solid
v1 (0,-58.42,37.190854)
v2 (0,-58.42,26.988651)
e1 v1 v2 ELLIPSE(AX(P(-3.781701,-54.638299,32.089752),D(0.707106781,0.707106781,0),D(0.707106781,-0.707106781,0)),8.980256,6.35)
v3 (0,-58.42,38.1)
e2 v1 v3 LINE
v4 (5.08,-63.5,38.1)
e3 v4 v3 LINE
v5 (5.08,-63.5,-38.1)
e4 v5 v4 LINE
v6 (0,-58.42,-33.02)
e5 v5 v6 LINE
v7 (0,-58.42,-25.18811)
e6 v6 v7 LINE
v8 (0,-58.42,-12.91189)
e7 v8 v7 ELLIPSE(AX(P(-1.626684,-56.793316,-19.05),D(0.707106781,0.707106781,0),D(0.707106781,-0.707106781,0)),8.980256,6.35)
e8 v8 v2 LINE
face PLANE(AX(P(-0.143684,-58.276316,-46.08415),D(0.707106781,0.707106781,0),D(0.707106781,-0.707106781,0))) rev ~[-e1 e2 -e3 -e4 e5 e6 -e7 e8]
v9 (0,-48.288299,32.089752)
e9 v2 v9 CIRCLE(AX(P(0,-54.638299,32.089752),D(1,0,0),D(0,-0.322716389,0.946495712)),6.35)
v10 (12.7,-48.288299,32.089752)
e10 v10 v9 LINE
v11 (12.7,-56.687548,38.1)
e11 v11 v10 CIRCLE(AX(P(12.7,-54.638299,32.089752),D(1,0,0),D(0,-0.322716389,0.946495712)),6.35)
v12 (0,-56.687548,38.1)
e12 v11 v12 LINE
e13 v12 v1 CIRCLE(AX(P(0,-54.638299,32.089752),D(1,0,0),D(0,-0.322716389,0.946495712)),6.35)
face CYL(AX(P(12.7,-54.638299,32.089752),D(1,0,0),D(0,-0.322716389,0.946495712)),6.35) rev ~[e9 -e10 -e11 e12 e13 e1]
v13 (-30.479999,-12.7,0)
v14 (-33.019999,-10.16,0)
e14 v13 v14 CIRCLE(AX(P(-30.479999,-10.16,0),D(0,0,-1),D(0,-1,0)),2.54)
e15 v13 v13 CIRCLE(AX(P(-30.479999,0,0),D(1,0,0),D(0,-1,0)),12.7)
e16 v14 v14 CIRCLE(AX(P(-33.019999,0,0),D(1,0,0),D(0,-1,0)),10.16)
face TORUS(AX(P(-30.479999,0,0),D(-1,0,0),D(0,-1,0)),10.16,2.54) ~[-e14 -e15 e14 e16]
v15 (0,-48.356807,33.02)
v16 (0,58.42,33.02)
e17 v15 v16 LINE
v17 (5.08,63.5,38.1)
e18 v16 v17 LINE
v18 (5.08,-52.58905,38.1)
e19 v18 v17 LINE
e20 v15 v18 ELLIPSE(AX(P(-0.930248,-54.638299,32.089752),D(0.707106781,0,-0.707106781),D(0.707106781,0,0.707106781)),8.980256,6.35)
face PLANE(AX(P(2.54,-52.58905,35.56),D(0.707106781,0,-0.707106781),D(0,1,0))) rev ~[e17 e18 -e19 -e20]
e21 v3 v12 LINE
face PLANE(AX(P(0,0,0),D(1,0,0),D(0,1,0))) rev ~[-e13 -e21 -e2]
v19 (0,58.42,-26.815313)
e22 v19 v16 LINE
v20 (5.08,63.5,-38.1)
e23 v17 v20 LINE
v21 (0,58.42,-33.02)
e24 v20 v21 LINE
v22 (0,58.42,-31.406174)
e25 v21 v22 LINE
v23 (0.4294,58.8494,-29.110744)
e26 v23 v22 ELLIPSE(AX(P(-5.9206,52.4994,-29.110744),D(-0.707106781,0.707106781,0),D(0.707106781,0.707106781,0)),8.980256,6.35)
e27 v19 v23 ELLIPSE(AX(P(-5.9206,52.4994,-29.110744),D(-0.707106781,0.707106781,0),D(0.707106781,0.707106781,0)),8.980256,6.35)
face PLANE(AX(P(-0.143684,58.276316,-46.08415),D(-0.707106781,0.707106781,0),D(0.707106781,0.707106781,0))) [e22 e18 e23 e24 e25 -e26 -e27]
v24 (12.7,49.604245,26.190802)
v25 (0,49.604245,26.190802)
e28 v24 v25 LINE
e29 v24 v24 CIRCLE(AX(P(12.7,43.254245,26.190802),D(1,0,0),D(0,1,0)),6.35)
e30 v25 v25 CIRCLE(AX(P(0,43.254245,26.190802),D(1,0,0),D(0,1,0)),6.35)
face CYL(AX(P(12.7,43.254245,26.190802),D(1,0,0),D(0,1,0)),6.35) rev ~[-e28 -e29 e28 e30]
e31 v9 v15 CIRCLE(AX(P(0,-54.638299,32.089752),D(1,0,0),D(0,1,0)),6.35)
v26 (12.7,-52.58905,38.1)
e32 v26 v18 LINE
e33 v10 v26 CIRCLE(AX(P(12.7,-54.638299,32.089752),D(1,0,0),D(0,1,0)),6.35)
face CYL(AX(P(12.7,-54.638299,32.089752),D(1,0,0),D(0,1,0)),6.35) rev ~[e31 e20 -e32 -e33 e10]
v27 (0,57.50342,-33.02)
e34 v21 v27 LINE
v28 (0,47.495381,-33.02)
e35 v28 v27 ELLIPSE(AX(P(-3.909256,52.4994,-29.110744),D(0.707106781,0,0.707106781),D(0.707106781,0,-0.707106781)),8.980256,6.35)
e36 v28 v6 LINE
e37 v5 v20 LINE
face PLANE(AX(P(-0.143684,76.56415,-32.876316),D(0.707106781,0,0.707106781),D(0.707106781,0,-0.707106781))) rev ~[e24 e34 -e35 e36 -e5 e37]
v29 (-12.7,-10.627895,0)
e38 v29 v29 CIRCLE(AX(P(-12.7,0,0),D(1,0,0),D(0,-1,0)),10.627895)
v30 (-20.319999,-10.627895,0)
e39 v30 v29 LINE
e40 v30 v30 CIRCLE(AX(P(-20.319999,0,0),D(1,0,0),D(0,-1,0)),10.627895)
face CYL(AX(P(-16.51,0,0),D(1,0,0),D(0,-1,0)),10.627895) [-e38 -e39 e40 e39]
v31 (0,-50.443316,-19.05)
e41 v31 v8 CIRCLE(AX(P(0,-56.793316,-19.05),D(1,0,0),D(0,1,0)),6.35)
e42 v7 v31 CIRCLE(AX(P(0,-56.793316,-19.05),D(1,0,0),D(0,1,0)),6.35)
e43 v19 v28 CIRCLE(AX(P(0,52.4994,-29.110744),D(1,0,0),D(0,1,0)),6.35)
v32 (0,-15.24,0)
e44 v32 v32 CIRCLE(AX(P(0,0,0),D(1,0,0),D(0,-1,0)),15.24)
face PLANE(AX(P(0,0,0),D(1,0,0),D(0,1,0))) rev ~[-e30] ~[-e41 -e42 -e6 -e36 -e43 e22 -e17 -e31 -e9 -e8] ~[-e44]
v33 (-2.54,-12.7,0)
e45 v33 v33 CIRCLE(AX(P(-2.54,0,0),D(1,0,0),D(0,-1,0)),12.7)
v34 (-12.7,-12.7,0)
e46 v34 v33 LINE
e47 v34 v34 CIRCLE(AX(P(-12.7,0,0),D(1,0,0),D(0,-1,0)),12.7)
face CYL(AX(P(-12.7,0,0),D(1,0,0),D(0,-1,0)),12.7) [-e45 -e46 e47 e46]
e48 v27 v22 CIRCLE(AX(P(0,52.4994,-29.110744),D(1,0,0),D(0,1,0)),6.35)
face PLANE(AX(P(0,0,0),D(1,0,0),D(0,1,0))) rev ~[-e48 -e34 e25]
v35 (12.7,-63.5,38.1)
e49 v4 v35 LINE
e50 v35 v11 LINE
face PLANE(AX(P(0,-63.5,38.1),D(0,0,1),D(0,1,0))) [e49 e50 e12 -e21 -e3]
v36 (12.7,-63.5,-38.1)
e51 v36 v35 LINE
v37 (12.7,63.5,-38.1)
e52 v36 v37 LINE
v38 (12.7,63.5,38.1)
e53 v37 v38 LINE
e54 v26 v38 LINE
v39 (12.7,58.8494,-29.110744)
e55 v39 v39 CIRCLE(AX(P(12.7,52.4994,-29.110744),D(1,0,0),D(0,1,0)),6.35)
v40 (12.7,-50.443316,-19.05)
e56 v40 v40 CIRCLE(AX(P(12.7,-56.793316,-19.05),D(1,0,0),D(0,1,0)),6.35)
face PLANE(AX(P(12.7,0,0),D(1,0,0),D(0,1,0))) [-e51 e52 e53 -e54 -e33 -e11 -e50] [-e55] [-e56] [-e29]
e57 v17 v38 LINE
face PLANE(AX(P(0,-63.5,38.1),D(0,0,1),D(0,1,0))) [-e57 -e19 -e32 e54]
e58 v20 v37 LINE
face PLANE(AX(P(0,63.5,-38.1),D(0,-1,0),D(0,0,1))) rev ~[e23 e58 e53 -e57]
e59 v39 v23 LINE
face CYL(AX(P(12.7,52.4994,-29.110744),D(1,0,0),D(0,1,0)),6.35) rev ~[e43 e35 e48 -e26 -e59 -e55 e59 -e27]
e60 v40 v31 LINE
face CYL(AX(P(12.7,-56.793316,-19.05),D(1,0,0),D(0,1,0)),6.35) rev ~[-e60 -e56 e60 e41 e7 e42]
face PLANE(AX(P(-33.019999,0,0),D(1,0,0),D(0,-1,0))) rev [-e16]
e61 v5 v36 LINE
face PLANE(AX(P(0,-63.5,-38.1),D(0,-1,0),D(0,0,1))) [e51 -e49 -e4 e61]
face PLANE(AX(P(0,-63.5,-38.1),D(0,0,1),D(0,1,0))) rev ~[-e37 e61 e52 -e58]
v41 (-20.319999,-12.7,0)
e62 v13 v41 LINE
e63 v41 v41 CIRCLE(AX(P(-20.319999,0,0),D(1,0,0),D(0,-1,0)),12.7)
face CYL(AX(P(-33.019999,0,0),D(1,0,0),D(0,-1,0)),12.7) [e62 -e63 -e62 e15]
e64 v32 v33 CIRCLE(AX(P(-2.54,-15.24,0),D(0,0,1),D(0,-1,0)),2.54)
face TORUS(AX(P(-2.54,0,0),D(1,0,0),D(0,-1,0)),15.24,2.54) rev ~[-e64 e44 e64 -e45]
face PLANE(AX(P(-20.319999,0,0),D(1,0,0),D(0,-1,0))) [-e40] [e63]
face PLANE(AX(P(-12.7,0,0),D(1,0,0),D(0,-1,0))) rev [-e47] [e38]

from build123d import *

# Parameters (mm, degrees)
F0_W        = 127
F0_H        = 76.2
F1_DEPTH    = 12.7
F2_R        = 6.35
F3_DEPTH    = 12.701
F4_W        = 7.6199990327
F4_H        = 10.6278949787
F6_R        = 2.54
F7_C1_SIZE  = 5.08
F7_T2_DEPTH = 153.1282991577
F7_T4_DEPTH = 97.2482991577
F7_T6_DEPTH = 92.1682991577


# Not quite as in the source:
# - a fillet or chamfer that OpenCascade refuses, or shapes differently, is made with other operations: its cross-section is extruded or revolved along the edge and cut away or added
# - a feature names something its author has since deleted; it is built from what else it names


with BuildPart() as f1:
    # F0 (on Right) → F1 (new body)
    with BuildSketch(Plane.YZ):
        Rectangle(F0_W, F0_H)
    extrude(amount=F1_DEPTH)

    # F2 (on face) → F3 (cut, through all)
    with BuildSketch(Plane.YZ.offset(12.7)):
        with BuildLine():
            ThreePointArc((-56.6875480297, 38.1), (-58.333550533, 26.9256825374), (-48.2882989585, 32.089752231))
            ThreePointArc((-48.2882989585, 32.089752231), (-49.4742292648, 35.7850038056), (-52.5890498873, 38.1))
            Line((-52.5890498873, 38.1), (-56.6875480297, 38.1))
        make_face()
        with Locations((-56.7933163234, -19.05)):
            Circle(F2_R)
        with Locations((52.4994003593, -29.1107435445)):
            Circle(F2_R)
        with Locations((43.2542454979, 26.190802066)):
            Circle(F2_R)
    extrude(amount=-F3_DEPTH, mode=Mode.SUBTRACT)

    # F4 (on Top) → F5 (revolve)
    with BuildSketch(Plane.XY):
        Polygon((-20.3199990327, -10.6278949787), (-20.3199990327, 0), (-33.0199990327, 0), (-33.0199990327, -12.7), (-20.3199990327, -12.7), align=None)
        with Locations((-16.5099995164, -5.3139474893)):
            Rectangle(F4_W, F4_H)
        Polygon((0, 0), (-12.7, 0), (-12.7, -10.6278949787), (-12.7, -12.7), (0, -12.7), align=None)
    revolve(axis=Axis((-26.6699990327, 0, 0), (1, 0, 0)))

    # F6
    f6_edges = [f1.edges().sort_by_distance(p)[0] for p in [
        (-33.019999, 12.7, 0),
        (0, 12.7, 0),
    ]]
    fillet(f6_edges, radius=F6_R)

    # F7: chamfer of 5.08 on 4 edges, made by hand

    # F7_c1
    f7_c1_edges = [f1.edges().sort_by_distance(p)[0] for p in [
        (0, 5.4554750563, 38.1),
    ]]
    chamfer(f7_c1_edges, length=F7_C1_SIZE)

    # F7_s3 → F7_t2 (cut)
    with BuildSketch(Plane.XZ.offset(-76.5641495789)):
        with BuildLine():
            Line((-0.1436840979, -32.8763159021), (5.2236840979, -38.2436840979))
            Line((5.2236840979, -38.2436840979), (5.2236840979, -38.3452840979))
            ThreePointArc((5.2236840979, -38.3452840979), (2.611842049, -38.2016), (0, -38.2016))
            Line((0, -38.2016), (-0.1016, -38.1))
            ThreePointArc((-0.1016, -38.1), (-0.1016, -35.488157951), (-0.2452840979, -32.8763159021))
            Line((-0.2452840979, -32.8763159021), (-0.1436840979, -32.8763159021))
        make_face()
    extrude(amount=F7_T2_DEPTH, mode=Mode.SUBTRACT)

    # F7_s5 → F7_t4 (cut)
    with BuildSketch(Plane.XY.offset(-46.0841495789)):
        with BuildLine():
            Line((-0.1436840979, -58.2763159021), (5.2236840979, -63.6436840979))
            Line((5.2236840979, -63.6436840979), (5.2236840979, -63.7452840979))
            ThreePointArc((5.2236840979, -63.7452840979), (2.611842049, -63.6016), (0, -63.6016))
            Line((0, -63.6016), (-0.1016, -63.5))
            ThreePointArc((-0.1016, -63.5), (-0.1016, -60.888157951), (-0.2452840979, -58.2763159021))
            Line((-0.2452840979, -58.2763159021), (-0.1436840979, -58.2763159021))
        make_face()
    extrude(amount=F7_T4_DEPTH, mode=Mode.SUBTRACT)

    # F7_s7 → F7_t6 (cut)
    with BuildSketch(Plane.XY.offset(-46.0841495789)):
        with BuildLine():
            Line((-0.1436840979, 58.2763159021), (5.2236840979, 63.6436840979))
            Line((5.2236840979, 63.6436840979), (5.2236840979, 63.7452840979))
            ThreePointArc((5.2236840979, 63.7452840979), (2.611842049, 63.6016), (0, 63.6016))
            Line((0, 63.6016), (-0.1016, 63.5))
            ThreePointArc((-0.1016, 63.5), (-0.1016, 60.888157951), (-0.2452840979, 58.2763159021))
            Line((-0.2452840979, 58.2763159021), (-0.1436840979, 58.2763159021))
        make_face()
    extrude(amount=F7_T6_DEPTH, mode=Mode.SUBTRACT)


solid = f1.part
